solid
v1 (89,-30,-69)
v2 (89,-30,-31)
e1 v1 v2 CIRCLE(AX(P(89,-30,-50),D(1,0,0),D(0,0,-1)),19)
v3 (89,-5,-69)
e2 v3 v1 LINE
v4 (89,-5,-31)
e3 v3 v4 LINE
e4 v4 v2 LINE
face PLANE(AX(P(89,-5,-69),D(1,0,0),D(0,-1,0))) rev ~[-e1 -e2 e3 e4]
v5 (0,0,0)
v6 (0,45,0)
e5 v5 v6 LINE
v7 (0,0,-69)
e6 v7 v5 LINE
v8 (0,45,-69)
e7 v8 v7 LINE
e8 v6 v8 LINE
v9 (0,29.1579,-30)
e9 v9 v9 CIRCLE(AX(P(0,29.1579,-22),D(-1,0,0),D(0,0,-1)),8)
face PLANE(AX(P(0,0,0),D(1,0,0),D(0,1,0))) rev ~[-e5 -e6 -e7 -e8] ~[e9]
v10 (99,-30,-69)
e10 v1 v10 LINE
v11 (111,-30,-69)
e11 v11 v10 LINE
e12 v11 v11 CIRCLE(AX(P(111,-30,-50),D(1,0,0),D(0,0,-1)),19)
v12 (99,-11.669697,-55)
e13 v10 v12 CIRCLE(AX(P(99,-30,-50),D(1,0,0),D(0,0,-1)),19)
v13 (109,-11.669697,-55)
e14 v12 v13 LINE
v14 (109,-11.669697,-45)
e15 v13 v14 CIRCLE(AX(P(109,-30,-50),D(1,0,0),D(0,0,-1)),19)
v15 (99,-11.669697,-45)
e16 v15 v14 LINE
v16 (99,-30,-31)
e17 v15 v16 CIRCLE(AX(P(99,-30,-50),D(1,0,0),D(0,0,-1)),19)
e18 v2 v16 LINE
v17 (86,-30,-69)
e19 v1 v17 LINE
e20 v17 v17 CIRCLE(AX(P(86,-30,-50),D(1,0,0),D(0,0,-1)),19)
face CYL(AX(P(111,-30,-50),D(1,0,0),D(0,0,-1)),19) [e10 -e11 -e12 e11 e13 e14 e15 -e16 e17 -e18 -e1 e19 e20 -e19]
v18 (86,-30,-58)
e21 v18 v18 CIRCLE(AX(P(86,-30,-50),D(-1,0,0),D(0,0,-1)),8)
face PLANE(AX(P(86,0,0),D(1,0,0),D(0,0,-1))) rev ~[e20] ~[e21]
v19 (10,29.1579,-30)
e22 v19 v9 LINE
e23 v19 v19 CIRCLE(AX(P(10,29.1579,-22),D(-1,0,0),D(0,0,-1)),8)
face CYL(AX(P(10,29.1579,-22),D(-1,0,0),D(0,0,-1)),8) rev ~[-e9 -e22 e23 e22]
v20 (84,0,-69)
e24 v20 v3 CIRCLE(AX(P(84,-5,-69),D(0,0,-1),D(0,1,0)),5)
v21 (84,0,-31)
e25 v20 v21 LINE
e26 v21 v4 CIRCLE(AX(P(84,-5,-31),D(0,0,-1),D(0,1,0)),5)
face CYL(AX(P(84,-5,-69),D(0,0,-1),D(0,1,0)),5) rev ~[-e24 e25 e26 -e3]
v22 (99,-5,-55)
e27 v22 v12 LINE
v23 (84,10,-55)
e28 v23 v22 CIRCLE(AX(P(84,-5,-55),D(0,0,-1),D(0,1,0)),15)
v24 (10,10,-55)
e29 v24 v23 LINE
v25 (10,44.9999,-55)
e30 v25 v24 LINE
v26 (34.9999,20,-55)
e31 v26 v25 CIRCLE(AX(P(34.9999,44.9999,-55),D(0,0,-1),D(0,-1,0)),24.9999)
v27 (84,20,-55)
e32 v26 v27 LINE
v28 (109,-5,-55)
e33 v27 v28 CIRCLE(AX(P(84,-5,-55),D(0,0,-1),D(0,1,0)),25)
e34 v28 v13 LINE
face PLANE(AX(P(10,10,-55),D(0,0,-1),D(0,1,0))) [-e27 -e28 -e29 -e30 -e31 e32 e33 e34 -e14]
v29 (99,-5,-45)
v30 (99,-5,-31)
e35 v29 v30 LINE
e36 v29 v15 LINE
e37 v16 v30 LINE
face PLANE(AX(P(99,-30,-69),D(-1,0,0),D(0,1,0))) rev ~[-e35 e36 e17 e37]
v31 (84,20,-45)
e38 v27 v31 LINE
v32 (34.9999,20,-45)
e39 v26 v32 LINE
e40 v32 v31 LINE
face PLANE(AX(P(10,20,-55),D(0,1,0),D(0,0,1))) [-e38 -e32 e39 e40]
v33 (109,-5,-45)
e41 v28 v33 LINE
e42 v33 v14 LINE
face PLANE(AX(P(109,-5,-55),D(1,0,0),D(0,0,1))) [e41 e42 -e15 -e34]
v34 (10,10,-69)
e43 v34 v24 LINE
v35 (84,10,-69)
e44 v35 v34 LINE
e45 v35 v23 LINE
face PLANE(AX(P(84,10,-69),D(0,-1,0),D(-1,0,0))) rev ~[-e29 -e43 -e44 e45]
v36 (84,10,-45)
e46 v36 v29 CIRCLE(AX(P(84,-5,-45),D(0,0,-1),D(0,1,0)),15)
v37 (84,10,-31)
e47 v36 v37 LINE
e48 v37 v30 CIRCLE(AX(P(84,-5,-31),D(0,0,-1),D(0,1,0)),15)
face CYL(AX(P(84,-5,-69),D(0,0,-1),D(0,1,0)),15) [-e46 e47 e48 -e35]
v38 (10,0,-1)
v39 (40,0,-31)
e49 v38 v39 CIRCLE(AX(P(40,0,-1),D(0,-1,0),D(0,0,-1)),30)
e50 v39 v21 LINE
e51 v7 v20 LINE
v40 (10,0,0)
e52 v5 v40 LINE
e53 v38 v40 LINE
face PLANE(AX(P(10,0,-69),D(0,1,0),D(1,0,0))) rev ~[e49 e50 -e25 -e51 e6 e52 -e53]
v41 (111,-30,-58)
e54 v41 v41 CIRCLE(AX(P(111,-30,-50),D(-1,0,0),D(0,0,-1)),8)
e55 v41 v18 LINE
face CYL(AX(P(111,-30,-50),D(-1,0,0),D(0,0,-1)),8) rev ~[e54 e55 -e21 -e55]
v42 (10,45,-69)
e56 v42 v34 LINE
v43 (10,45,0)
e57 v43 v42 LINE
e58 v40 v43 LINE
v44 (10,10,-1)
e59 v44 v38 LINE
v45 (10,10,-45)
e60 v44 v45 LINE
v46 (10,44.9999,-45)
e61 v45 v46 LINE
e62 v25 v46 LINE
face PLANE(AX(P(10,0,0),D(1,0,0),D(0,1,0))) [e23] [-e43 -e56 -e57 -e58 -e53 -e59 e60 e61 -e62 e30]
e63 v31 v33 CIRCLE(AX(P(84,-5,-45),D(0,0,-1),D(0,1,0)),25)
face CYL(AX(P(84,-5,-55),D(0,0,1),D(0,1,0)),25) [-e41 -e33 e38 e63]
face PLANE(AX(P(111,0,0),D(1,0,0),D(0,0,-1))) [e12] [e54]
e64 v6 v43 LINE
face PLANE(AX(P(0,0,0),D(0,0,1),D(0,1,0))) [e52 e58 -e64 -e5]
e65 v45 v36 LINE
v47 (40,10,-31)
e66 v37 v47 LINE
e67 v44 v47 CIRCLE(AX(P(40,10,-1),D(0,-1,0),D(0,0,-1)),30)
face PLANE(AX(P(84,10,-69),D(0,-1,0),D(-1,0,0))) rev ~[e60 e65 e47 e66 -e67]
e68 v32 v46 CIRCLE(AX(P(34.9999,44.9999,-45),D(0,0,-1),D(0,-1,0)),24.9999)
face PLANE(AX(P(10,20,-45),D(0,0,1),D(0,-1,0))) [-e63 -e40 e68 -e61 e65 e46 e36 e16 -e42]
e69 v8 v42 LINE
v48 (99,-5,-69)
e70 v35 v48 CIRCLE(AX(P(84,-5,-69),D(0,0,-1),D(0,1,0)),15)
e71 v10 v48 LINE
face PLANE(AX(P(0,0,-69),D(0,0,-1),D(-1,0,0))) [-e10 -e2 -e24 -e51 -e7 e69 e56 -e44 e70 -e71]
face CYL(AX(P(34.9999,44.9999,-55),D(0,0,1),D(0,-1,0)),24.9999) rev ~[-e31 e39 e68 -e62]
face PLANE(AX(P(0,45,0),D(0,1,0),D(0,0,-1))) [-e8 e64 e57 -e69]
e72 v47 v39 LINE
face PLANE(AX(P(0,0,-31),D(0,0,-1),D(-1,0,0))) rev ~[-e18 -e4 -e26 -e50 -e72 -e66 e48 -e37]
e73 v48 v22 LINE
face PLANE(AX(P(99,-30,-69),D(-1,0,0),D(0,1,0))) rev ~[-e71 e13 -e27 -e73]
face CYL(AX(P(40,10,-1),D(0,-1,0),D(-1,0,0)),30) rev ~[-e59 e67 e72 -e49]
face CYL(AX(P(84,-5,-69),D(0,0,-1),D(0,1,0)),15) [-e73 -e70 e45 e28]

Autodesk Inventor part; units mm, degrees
ref_plane "YZ Plane" through (0, 0, 0) normal (1, 0, 0) x (0, 1, 0)
ref_plane "XZ Plane" through (0, 0, 0) normal (0, 1, 0) x (-1, 0, 0)
sketch "Esboço1" plane through (0, 0, 0) normal (1, 0, 0) x (0, 1, 0)
  line L0 (0, 0) -> (45, 0)
  line L1 (45, 0) -> (45, -69)
  line L2 (45, -69) -> (0, -69)
  line L3 (0, -69) -> (0, 0)
  dimension "d0" = 45
  dimension "d1" = 69
extrude "Extrusão1" add sketch "Esboço1" along normal blind 10
sketch "Esboço2" plane through (10, 0, 0) normal (1, 0, 0) x (0, 0, -1)
  line L0 (0, 45) -> (0, 0) projected
  point P0 (22, 29.1579)
  dimension "d4" = 22
hole "Furo1" at (10, 29.1579, -22) direction (-1, 0, 0) diameter 16 end through all
ref_plane "Plano de trabalho1" through (111, 0, 0) normal (1, 0, 0) x (0, 0, -1)
sketch "Esboço3" plane through (111, 0, 0) normal (1, 0, 0) x (0, 0, -1)
  circle A0 centre (50, -30) radius 19
  line L0 (69, 0) -> (69, 45) projected
  line L1 (69, 45) -> (0, 45) projected
  point P0 (0, 0)
  dimension "d13" = 38
  dimension "d14" = 75
extrude "Extrusão2" add sketch "Esboço3" against normal blind 25
sketch "Esboço4" plane through (0, 0, -69) normal (0, 0, -1) x (-1, 0, 0)
  line L0 (-10, 0) -> (-84, 0)
  line L1 (-89, -5) -> (-89, -30)
  line L2 (-89, -30) -> (-99, -30)
  line L3 (-99, -30) -> (-99, -5)
  line L4 (-84, 10) -> (-10, 10)
  line L5 (-10, 10) -> (-10, 0)
  line L6 (-111, -11) -> (-111, -49) construction
  line L7 (-111, -30) -> (-86, -30) construction
  line L8 (-86, -49) -> (-86, -11) construction
  arc A0 (-84, 0) -> (-89, -5) centre (-84, -5) ccw
  arc A1 (-84, 10) -> (-99, -5) centre (-84, -5) ccw
  point P0 (0, 0)
  dimension "d17" = 3
  dimension "d18" = 10
  dimension "d19" = 10
  dimension "d20" = 5
  dimension "d21" = 15
extrude "Extrusão3" add sketch "Esboço4" against normal blind 38
sketch "Esboço5" plane through (10, 0, 0) normal (1, 0, 0) x (0, 0, -1)
  line L0 (69, 10) -> (31, 10) projected
  line L1 (45, 10) -> (55, 10)
  line L2 (55, 10) -> (55, 20)
  line L3 (55, 20) -> (45, 20)
  line L4 (45, 20) -> (45, 10)
  line L5 (31, 10) -> (31, -5) projected
  point P0 (0, 0)
  dimension "d24" = 10
  dimension "d25" = 10
  dimension "d26" = 14
sketch3d "Esboço 3D1"
  line L0 (10, 10, -69) -> (84, 10, -69)
  arc A0 (84, 10, -69) -> (99, -5, -69) centre (84, -5, -69) ccw
  line L1 (99, -5, -69) -> (99, -30, -69)
sweep "Varredura1" add profiles "Esboço5" path "Esboço 3D1"
fillet "Arredondamento1" radius 25 1 edges at (10, 20, -50)
fillet "Arredondamento2" radius 30 1 edges at (10, 5, -31)
sketch "Esboço6" plane through (111, -30, -50) normal (1, 0, 0) x (0, 0, -1)
  circle A0 centre (0, 0) radius 19 projected
  point P0 (-50, 30)
hole "Furo2" at (111, -30, -50) direction (-1, 0, 0) diameter 16 end through all
properties part number "Peça teste 5" material "Prata"
